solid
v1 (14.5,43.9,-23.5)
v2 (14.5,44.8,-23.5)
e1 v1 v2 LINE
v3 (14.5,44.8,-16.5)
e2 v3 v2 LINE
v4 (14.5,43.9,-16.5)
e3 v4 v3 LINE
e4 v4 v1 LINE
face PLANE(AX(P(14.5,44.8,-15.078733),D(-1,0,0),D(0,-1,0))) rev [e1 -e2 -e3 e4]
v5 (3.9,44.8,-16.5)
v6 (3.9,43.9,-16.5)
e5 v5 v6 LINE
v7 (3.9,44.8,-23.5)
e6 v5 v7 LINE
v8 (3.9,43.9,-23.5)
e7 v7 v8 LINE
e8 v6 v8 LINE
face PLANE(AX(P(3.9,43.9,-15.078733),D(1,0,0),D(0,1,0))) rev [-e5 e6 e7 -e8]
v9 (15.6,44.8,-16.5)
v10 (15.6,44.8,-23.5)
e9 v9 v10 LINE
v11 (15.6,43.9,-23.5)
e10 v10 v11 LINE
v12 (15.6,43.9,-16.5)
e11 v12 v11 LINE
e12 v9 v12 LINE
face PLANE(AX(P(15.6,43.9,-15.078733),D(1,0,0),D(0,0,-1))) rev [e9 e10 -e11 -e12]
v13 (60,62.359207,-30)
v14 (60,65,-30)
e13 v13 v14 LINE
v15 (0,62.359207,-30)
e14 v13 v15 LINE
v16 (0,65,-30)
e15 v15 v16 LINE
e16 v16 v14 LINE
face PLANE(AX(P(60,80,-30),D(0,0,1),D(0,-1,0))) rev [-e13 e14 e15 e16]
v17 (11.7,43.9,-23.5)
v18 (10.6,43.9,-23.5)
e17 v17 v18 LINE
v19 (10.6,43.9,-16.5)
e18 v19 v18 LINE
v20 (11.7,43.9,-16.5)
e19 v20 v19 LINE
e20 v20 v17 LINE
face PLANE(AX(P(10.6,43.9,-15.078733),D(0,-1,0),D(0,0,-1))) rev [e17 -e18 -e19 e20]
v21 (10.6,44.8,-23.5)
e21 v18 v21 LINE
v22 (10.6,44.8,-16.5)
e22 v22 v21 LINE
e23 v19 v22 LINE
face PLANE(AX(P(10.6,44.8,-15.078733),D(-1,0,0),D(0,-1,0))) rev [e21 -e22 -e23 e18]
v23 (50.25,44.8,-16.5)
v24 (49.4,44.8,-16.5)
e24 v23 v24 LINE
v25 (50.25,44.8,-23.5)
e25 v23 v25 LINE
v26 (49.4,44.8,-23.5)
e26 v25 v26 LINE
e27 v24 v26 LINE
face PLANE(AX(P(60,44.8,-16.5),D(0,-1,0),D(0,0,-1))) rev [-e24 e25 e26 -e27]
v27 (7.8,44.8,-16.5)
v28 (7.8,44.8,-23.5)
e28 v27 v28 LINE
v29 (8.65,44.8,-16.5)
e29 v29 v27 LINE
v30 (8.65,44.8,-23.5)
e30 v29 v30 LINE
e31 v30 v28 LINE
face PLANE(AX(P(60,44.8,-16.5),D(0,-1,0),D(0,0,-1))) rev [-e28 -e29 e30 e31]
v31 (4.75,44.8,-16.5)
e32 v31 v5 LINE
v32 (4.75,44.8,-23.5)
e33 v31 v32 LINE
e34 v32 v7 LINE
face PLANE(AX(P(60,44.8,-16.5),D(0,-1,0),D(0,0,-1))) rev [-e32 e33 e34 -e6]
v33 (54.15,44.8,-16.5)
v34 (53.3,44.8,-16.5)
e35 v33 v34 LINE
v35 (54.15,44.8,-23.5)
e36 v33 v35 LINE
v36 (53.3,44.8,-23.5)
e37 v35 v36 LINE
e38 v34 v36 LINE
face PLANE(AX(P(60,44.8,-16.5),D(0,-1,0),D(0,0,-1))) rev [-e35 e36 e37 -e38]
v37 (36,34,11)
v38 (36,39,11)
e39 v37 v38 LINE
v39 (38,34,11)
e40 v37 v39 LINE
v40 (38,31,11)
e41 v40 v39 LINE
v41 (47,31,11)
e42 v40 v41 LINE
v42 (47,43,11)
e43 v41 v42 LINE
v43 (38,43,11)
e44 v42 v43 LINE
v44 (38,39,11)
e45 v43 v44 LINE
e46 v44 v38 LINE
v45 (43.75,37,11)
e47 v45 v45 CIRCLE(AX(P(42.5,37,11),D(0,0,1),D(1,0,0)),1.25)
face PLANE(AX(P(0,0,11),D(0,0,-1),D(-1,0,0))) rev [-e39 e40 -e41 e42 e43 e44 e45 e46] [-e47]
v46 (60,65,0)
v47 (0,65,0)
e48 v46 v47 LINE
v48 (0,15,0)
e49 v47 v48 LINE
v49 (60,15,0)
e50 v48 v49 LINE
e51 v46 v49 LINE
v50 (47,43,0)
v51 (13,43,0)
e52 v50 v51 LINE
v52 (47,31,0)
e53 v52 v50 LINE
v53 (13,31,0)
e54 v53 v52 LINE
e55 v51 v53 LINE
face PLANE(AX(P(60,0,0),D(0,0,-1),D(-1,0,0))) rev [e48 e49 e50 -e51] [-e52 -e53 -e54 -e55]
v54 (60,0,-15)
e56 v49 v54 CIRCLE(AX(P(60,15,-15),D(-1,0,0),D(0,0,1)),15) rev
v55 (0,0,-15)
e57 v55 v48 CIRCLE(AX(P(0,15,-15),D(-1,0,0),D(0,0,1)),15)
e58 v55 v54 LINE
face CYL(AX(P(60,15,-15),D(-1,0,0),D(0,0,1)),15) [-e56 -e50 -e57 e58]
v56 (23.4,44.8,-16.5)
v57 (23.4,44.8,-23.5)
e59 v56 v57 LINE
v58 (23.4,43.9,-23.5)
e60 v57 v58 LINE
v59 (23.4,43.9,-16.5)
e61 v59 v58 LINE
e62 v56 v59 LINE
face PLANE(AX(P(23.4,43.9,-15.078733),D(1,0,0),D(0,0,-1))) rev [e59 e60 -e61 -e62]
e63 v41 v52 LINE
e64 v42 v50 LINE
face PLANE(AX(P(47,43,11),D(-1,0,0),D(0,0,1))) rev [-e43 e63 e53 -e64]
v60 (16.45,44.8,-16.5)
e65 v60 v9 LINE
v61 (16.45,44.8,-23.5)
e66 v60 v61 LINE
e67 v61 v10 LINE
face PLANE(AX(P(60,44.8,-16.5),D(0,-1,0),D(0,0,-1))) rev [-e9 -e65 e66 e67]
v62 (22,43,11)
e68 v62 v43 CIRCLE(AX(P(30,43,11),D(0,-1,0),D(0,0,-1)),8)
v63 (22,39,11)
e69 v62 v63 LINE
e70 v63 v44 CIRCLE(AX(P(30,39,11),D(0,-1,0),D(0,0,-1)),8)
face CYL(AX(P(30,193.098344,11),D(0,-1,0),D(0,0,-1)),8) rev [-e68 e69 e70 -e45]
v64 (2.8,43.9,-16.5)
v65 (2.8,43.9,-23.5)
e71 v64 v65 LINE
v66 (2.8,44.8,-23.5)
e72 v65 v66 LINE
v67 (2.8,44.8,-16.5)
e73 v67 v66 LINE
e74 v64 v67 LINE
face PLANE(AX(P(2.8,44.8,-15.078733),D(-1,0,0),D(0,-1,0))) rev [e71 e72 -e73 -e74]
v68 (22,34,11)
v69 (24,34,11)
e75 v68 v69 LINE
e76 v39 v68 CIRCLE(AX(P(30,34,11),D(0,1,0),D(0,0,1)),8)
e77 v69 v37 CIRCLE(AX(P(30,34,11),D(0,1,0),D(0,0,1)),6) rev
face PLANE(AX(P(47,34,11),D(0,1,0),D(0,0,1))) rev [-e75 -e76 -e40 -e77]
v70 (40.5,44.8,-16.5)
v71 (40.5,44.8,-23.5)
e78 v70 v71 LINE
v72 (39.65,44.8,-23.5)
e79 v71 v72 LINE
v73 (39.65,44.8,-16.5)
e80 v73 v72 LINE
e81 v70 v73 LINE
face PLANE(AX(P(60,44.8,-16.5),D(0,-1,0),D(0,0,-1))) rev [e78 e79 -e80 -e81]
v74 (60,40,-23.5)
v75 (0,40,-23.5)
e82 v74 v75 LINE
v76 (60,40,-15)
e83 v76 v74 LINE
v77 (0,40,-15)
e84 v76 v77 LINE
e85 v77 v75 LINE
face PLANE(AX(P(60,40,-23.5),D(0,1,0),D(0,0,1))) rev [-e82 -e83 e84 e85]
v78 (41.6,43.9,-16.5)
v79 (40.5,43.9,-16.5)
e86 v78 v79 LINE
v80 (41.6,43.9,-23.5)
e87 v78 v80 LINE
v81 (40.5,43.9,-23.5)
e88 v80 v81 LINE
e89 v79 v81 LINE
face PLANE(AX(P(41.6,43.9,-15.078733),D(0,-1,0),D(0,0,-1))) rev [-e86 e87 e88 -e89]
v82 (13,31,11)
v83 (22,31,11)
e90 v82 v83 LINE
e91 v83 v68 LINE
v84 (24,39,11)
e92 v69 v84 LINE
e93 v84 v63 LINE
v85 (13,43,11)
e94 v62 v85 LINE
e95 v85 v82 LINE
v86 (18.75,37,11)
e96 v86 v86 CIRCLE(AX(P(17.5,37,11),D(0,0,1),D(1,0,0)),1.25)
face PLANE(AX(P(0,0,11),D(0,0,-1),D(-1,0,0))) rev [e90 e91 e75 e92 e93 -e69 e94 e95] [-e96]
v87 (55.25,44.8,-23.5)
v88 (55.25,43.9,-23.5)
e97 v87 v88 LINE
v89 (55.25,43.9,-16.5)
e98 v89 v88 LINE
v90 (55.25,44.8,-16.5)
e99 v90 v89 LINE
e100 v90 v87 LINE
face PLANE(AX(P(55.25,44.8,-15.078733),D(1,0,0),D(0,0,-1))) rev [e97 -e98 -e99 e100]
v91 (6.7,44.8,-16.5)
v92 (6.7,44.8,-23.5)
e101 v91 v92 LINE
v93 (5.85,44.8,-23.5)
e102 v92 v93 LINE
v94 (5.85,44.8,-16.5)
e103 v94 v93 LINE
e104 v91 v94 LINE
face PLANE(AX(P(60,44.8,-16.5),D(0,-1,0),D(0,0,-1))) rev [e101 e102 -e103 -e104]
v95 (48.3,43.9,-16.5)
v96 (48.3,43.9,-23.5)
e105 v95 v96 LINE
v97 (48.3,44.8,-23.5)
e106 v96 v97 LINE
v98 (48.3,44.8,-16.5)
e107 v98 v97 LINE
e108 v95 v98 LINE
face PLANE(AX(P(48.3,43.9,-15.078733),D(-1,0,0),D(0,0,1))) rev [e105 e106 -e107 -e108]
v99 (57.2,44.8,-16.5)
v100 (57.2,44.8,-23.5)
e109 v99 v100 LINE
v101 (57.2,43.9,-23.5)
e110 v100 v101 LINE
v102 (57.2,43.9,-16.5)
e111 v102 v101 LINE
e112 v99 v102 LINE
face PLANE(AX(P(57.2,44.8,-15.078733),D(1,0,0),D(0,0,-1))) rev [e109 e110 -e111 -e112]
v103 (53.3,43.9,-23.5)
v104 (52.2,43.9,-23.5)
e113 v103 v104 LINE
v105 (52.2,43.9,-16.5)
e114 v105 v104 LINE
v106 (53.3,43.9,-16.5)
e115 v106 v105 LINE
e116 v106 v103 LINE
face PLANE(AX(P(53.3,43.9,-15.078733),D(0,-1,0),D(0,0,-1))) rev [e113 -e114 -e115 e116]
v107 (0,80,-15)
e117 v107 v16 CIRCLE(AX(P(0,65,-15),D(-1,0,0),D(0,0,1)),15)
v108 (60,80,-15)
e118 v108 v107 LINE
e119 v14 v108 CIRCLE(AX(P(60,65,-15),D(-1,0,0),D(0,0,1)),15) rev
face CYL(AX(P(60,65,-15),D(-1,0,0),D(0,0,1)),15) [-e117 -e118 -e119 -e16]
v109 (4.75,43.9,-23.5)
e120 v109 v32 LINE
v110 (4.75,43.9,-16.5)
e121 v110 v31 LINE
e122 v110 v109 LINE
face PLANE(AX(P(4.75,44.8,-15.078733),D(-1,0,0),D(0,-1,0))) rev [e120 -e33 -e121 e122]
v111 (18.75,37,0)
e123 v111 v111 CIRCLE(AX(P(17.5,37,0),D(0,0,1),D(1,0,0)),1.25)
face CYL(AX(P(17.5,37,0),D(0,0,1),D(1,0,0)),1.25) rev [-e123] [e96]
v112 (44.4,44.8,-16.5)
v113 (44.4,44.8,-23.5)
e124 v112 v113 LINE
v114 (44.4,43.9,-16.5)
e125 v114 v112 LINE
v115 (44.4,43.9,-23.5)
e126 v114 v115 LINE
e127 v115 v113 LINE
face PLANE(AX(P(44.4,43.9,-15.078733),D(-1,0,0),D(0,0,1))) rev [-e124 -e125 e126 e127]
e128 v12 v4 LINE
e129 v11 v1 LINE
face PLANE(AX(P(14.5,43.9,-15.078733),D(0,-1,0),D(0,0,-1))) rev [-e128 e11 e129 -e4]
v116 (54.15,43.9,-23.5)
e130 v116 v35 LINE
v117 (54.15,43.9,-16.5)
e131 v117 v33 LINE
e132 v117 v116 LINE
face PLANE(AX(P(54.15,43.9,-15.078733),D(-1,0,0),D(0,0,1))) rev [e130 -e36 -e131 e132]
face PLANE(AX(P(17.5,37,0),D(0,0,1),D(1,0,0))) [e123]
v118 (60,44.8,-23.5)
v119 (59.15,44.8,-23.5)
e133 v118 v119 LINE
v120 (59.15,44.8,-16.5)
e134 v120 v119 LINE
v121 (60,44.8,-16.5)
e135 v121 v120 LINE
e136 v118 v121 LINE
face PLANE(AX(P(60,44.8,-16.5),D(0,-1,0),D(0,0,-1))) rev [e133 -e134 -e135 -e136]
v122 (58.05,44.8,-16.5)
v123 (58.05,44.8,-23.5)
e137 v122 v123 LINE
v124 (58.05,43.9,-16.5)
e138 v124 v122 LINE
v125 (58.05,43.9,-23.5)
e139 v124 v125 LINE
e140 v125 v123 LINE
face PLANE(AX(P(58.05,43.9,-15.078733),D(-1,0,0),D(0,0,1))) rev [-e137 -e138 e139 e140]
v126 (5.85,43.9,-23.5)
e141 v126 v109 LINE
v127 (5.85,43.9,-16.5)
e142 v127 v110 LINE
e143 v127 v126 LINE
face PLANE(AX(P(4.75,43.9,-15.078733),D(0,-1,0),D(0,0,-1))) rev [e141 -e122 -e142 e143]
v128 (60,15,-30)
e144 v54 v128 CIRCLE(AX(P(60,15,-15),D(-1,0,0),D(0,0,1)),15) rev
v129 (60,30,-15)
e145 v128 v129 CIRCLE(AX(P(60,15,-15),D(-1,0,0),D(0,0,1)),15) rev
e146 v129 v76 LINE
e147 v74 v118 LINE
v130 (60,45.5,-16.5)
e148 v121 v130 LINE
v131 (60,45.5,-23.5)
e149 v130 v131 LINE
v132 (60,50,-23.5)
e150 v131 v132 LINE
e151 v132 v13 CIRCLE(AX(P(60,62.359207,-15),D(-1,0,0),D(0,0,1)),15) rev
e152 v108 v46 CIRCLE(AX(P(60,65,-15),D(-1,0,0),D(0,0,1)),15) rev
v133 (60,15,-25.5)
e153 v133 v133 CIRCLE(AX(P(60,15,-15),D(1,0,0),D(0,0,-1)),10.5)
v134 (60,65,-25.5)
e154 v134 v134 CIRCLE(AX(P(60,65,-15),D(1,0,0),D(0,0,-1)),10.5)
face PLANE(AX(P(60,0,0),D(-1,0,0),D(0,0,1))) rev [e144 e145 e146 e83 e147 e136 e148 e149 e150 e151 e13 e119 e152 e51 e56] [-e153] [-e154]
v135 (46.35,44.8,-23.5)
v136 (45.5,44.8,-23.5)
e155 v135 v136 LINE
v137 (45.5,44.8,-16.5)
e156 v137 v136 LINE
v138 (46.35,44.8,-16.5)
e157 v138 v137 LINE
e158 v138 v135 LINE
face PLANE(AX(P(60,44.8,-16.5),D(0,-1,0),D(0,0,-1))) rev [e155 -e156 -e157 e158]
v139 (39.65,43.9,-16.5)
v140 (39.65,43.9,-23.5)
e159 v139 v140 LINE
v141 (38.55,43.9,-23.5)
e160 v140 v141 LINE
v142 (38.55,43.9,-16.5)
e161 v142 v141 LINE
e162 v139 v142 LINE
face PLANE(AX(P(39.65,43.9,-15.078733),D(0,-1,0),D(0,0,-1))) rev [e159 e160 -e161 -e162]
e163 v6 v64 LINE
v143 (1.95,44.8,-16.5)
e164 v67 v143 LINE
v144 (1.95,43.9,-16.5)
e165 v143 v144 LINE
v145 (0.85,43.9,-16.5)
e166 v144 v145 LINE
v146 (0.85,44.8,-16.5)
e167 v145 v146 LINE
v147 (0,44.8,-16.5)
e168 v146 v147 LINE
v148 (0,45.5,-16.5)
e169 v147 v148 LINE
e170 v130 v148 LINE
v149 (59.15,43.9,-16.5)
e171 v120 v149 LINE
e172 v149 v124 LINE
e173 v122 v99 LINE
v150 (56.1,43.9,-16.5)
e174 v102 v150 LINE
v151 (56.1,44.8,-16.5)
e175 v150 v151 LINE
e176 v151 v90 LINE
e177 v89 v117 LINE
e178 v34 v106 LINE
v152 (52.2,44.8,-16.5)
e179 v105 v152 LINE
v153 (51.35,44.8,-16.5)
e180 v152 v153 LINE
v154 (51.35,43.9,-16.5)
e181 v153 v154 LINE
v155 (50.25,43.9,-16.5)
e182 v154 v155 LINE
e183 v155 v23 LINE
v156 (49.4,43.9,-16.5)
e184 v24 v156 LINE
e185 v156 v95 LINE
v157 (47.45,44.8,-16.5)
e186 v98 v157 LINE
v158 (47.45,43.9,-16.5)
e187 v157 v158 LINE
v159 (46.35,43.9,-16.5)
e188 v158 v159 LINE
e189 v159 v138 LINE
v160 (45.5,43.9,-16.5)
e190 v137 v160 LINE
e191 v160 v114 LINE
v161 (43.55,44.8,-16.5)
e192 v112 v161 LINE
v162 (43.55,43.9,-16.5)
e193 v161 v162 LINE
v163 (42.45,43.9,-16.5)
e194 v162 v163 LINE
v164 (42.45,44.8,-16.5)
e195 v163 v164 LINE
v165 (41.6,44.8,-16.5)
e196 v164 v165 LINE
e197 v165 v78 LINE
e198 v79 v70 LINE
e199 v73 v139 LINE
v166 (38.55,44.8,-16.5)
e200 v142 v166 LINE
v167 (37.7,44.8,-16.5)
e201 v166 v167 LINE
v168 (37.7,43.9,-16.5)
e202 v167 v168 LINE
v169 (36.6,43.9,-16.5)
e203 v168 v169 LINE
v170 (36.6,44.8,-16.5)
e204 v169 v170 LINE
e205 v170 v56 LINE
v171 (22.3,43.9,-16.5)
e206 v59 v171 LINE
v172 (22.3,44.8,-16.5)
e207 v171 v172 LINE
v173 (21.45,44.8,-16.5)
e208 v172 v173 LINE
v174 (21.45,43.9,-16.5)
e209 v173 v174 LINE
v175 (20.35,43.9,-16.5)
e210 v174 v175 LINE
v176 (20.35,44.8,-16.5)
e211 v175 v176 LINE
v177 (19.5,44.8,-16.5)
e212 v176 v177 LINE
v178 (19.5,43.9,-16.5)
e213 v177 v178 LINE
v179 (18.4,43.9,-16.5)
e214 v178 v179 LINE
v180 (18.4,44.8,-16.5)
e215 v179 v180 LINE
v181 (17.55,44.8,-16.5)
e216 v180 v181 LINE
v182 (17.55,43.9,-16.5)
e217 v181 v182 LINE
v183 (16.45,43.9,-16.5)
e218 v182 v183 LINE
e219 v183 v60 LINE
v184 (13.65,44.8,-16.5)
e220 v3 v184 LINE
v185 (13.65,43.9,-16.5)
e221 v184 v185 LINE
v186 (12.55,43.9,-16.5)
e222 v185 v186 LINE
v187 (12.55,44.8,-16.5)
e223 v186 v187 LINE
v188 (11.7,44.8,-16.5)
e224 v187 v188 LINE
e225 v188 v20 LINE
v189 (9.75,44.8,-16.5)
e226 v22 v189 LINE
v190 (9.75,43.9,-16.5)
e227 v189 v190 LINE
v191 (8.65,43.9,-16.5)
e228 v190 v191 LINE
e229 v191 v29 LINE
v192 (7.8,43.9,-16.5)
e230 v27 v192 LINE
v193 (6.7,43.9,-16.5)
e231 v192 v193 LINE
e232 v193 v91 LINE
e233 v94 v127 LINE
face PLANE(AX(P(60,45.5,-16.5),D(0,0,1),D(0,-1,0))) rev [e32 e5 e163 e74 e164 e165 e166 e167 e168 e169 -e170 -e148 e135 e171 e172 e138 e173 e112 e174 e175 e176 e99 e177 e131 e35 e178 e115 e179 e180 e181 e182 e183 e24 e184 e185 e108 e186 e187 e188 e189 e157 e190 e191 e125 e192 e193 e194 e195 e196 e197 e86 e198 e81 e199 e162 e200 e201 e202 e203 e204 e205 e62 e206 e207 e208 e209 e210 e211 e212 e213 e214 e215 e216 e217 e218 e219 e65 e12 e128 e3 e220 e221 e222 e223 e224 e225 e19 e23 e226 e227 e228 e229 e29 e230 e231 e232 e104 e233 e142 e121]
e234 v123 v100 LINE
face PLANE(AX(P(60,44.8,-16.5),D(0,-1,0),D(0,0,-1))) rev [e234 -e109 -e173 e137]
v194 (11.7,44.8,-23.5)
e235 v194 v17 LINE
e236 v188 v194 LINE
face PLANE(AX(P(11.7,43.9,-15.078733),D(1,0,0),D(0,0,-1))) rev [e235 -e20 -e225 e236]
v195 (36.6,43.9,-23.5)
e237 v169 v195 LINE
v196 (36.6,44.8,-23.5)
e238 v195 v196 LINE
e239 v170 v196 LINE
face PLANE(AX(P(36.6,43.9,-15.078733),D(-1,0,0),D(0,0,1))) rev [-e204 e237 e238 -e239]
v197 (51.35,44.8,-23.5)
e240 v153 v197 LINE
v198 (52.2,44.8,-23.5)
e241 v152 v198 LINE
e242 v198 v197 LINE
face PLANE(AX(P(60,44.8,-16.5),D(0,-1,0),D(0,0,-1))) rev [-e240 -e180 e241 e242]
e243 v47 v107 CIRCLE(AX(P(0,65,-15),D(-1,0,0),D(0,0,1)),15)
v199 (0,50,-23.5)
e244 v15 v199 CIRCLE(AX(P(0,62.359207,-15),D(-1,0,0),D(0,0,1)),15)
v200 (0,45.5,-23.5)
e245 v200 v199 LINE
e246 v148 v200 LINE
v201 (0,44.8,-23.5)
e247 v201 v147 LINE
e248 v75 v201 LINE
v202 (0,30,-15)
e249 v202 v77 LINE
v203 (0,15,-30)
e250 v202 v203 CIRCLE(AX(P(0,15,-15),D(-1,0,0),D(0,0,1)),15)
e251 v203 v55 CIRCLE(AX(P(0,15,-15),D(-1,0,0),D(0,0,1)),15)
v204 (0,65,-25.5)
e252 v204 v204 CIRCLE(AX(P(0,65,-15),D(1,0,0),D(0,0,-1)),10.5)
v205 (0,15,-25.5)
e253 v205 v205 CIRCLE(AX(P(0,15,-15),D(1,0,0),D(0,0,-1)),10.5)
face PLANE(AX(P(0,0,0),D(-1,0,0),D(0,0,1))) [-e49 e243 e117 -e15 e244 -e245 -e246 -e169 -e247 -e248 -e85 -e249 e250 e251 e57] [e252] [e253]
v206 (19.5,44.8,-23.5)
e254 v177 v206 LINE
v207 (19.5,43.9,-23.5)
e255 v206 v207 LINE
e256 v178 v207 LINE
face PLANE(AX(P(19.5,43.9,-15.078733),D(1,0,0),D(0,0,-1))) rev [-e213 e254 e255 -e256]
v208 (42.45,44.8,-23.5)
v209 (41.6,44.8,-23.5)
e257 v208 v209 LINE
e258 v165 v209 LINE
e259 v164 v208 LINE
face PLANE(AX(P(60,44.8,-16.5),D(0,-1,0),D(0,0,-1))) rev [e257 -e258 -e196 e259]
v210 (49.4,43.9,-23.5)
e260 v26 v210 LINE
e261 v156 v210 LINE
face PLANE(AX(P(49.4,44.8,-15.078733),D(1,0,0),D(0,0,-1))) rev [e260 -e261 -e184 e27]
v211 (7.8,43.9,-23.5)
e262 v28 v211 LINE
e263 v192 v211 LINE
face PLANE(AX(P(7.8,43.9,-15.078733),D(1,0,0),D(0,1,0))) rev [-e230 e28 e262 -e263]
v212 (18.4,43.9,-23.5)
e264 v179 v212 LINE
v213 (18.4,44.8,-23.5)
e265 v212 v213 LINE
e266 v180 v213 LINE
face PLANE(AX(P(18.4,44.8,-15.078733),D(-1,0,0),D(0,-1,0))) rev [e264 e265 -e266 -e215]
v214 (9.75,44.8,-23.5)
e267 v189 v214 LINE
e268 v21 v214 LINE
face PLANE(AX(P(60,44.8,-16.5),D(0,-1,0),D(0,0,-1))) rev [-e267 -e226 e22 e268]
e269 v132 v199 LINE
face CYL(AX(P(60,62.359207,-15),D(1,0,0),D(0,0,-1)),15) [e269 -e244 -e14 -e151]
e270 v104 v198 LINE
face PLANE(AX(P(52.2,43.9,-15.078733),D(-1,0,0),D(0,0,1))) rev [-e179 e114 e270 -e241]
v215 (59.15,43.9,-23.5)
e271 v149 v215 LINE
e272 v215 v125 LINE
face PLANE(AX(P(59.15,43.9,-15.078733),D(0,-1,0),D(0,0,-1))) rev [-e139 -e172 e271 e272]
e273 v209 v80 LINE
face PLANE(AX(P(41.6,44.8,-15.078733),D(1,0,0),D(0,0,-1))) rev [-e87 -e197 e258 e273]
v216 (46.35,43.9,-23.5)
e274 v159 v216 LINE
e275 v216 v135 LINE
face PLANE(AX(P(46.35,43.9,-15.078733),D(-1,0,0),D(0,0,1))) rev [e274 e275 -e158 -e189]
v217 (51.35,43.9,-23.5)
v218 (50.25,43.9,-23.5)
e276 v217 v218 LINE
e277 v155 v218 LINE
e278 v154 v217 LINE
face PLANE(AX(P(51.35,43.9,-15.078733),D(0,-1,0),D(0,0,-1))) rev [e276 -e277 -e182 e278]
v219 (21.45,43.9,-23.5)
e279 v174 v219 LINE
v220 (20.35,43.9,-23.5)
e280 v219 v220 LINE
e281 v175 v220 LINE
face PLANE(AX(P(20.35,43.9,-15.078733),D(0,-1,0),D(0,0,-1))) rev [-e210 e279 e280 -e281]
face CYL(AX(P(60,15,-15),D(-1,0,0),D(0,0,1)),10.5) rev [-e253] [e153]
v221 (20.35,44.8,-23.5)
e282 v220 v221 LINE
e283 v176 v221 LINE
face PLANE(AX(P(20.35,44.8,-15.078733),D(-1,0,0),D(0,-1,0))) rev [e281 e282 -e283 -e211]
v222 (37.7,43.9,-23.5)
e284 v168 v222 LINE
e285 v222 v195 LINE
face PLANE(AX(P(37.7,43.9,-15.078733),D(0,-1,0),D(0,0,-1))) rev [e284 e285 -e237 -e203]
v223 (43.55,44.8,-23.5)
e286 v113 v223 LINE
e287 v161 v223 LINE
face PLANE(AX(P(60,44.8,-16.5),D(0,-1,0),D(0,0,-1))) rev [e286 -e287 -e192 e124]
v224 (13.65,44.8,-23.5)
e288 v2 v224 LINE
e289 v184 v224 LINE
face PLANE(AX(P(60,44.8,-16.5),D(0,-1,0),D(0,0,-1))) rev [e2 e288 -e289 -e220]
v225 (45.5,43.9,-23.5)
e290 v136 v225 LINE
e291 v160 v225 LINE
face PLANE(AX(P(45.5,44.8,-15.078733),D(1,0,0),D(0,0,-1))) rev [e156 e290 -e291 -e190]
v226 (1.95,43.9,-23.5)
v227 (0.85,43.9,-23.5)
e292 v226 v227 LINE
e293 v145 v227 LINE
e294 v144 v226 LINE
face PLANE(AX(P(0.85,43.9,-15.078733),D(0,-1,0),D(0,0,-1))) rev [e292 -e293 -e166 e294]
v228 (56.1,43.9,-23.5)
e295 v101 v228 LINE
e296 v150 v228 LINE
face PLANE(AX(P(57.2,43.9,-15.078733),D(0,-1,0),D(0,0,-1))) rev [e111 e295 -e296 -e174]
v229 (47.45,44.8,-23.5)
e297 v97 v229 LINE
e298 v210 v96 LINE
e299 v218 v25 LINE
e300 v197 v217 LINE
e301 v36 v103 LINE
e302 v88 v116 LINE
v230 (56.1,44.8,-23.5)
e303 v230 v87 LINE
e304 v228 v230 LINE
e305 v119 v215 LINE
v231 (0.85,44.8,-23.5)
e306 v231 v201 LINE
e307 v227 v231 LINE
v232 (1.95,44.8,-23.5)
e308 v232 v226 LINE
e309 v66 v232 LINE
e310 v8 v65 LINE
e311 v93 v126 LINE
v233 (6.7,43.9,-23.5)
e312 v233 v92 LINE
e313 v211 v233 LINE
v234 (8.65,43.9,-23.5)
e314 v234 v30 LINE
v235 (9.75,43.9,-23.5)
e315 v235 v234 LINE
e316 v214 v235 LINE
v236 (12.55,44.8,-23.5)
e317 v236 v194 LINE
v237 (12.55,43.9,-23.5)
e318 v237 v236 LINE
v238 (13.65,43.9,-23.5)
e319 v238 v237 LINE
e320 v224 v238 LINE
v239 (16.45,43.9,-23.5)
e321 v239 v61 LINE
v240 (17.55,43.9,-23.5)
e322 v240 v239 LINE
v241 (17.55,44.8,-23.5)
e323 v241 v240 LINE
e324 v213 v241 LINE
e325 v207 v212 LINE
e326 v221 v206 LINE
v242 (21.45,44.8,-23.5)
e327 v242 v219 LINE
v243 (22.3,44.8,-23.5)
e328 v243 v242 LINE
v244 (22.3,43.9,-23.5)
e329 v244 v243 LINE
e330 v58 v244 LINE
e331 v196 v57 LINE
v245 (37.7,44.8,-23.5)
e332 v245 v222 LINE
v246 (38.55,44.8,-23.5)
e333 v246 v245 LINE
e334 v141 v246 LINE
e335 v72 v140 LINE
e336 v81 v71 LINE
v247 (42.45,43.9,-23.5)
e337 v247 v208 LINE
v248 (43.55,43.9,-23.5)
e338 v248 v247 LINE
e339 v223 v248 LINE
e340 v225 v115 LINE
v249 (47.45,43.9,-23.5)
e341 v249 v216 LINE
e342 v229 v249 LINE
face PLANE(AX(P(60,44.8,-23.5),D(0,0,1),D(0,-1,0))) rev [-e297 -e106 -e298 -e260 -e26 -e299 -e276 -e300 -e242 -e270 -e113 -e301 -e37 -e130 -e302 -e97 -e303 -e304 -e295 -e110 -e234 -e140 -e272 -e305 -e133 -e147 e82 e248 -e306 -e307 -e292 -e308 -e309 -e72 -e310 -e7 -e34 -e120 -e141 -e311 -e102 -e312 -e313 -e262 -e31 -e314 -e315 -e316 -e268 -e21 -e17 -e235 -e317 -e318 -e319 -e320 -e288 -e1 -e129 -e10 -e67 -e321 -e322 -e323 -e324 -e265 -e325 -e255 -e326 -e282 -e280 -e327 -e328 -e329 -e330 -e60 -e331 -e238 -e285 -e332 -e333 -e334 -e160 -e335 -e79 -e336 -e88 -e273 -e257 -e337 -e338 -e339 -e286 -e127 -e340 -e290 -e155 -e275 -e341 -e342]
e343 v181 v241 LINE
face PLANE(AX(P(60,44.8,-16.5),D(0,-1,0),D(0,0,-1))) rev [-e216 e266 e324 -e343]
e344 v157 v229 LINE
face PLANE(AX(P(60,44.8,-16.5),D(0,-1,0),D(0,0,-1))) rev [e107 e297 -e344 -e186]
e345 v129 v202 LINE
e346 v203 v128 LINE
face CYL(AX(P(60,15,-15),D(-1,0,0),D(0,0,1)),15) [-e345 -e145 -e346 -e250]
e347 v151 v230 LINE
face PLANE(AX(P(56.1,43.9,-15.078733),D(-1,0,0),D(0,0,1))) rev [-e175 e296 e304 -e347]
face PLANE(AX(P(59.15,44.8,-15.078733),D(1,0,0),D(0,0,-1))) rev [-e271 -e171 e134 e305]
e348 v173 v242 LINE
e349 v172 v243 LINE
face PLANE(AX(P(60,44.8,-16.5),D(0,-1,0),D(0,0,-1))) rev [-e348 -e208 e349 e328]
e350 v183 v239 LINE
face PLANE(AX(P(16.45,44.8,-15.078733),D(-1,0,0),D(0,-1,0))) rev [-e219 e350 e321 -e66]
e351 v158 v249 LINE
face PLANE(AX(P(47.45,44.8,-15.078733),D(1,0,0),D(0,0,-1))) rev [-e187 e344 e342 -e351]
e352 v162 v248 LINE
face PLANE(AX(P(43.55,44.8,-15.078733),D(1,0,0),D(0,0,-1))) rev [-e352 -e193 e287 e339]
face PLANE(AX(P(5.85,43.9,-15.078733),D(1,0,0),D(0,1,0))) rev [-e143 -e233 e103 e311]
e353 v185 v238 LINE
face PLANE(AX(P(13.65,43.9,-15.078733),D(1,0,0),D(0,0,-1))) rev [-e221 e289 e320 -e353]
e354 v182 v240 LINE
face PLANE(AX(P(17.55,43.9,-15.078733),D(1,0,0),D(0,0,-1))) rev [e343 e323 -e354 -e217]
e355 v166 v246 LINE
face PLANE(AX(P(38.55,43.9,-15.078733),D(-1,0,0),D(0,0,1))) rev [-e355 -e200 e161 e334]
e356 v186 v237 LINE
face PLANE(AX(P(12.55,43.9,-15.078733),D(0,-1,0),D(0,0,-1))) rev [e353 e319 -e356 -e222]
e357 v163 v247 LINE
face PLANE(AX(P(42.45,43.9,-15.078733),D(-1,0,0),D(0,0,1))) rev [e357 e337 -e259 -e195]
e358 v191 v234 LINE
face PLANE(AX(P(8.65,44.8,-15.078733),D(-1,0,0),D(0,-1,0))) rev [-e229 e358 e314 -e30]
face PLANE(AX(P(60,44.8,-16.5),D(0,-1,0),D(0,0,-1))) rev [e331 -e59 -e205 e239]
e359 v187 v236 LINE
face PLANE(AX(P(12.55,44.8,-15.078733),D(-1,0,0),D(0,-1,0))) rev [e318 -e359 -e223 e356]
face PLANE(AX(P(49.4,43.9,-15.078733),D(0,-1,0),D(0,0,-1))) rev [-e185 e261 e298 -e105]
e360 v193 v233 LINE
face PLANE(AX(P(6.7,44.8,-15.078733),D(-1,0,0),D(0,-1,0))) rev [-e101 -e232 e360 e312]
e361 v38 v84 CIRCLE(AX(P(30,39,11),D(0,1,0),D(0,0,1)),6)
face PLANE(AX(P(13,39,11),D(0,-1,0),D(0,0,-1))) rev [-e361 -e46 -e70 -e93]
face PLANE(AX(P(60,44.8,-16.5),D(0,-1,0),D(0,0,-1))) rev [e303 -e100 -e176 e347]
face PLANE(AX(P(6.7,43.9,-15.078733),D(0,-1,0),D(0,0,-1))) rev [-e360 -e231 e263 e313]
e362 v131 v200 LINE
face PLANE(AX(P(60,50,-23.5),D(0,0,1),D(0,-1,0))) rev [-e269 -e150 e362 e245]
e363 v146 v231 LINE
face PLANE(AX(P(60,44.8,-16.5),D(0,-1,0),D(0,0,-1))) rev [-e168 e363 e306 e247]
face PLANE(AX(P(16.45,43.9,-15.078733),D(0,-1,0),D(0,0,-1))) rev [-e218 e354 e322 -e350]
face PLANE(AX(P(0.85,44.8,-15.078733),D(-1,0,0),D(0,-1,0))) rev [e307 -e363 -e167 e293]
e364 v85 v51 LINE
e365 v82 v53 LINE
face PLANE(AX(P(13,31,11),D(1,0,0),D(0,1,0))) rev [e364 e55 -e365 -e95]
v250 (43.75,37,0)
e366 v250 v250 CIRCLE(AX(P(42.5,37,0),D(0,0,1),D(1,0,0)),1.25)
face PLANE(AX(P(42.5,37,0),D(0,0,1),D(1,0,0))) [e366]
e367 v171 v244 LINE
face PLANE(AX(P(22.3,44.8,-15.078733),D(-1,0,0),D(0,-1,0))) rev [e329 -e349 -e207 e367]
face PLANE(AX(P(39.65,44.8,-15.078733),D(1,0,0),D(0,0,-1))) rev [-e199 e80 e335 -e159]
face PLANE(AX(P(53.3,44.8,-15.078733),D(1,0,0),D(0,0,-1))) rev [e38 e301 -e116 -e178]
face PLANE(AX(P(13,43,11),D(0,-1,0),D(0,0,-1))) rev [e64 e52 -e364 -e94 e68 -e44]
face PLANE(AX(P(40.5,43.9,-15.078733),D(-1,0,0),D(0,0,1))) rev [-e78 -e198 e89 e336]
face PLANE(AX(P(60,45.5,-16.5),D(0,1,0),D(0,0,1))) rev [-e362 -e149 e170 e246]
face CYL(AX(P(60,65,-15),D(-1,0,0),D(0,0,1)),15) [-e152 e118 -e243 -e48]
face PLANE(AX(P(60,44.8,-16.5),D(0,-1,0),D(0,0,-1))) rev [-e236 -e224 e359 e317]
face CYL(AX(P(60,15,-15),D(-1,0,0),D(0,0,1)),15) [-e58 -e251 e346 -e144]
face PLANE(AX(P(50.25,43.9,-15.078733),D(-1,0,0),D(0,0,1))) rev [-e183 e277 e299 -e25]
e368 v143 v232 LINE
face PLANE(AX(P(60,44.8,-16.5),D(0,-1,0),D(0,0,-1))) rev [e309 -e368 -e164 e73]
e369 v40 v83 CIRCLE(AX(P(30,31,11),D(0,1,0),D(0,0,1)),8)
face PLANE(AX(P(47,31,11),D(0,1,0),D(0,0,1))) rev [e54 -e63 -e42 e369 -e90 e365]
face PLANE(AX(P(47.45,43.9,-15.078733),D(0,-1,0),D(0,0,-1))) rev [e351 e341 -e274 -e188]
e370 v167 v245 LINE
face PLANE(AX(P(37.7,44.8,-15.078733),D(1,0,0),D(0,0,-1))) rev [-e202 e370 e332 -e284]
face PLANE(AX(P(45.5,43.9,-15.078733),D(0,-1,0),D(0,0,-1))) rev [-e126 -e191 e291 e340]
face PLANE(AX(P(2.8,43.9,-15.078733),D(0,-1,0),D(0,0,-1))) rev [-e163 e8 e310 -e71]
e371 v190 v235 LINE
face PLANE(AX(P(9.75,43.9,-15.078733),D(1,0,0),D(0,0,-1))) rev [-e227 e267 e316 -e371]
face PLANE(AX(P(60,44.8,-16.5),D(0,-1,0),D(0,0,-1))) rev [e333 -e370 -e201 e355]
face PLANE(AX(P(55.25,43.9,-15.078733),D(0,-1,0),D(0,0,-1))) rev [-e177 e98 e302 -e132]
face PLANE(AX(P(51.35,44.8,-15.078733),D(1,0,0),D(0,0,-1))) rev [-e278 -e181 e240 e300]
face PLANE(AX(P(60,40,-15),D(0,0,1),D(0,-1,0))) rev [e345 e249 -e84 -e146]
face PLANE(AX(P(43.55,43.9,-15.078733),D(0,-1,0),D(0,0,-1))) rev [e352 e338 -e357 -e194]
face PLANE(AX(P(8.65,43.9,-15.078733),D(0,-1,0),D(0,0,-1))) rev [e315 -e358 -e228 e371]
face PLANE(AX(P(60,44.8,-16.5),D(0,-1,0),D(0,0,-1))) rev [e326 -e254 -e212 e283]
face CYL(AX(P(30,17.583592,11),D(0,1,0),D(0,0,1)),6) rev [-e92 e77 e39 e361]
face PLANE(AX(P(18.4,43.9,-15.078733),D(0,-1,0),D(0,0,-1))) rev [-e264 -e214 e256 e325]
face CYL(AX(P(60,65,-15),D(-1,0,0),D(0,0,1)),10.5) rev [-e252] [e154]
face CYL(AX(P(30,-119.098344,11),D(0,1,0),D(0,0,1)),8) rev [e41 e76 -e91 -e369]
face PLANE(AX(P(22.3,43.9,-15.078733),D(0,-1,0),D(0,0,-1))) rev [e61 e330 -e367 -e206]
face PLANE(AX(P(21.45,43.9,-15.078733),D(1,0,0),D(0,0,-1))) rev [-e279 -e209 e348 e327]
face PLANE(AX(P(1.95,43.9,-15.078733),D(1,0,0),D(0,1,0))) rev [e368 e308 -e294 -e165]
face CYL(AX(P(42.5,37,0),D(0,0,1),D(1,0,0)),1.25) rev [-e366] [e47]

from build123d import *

# Parameters (mm, degrees)
SKETCH_1_R               = 10.5
EXTRUDE_2_DEPTH          = 60
FILLET_1_R               = 15
FILLET_5_R               = 15
FILLET_3_R               = 15
SKETCH_2_W               = 34
SKETCH_2_H               = 12
EXTRUDE_3_DEPTH          = 11
CUT_EXTRUDE_1_DEPTH      = 12
CUT_EXTRUDE_2_DEPTH      = 80.680612447
CUT_EXTRUDE_2_DEPTH_BACK = 4
CUT_EXTRUDE_3_DEPTH      = 84.072257704
CUT_EXTRUDE_3_DEPTH_BACK = 3
SKETCH_6_R               = 1.25
CUT_EXTRUDE_4_DEPTH      = 11
FILLET_10_R              = 15
FILLET_11_R              = 15
FILLET_13_R              = 15
SKETCH_9_W               = 1.1
SKETCH_9_H               = 0.9
CUT_EXTRUDE_6_DEPTH      = 7
SKETCH_11_W              = 1.1
SKETCH_11_H              = 0.9
CUT_EXTRUDE_7_DEPTH      = 7


# Some blends are built 0.0001 mm under size
with BuildPart() as part:
    # Эскиз1 → Бобышка-Вытянуть2 (new body)
    with BuildSketch(Plane(origin=(0, 0, 0), x_dir=(0, 0, -1), z_dir=(1, 0, 0))):
        Polygon((0, 0), (0, 80), (30, 80), (30, 50), (23.5, 50), (23.5, 45.5), (16.5, 45.5), (16.5, 44.8), (23.5, 44.8), (23.5, 40), (16.5, 40), (15, 40), (15, 30), (30, 30), (30, 0), align=None)
        with Locations((15, 15)):
            Circle(SKETCH_1_R, mode=Mode.SUBTRACT)
        with Locations((15, 65)):
            Circle(SKETCH_1_R, mode=Mode.SUBTRACT)
    extrude(amount=EXTRUDE_2_DEPTH)

    # Скругление1
    fillet_1_edges = [part.edges().sort_by_distance(p)[0] for p in [
        (30, 30, -30),
    ]]
    fillet(fillet_1_edges, radius=FILLET_1_R - 0.0001)  # a hair under: the kernel refuses the full size

    # Скругление5
    fillet_5_edges = [part.edges().sort_by_distance(p)[0] for p in [
        (30, 80, -30),
    ]]
    fillet(fillet_5_edges, radius=FILLET_5_R)

    # Скругление3
    fillet_3_edges = [part.edges().sort_by_distance(p)[0] for p in [
        (30, 0, -30),
    ]]
    fillet(fillet_3_edges, radius=FILLET_3_R)

    # Эскиз2 → Бобышка-Вытянуть3 (add)
    with BuildSketch(Plane.XY):
        with Locations((30, 37)):
            Rectangle(SKETCH_2_W, SKETCH_2_H)
    extrude(amount=EXTRUDE_3_DEPTH)

    # Эскиз3 → Вырез-Вытянуть1 (cut)
    with BuildSketch(Plane(origin=(0, 43, 0), x_dir=(1, 0, 0), z_dir=(0, 1, 0))):
        with BuildLine():
            ThreePointArc((36, -11), (30, -5), (24, -11))
            Line((24, -11), (36, -11))
        make_face()
    extrude(amount=-CUT_EXTRUDE_1_DEPTH, mode=Mode.SUBTRACT)

    # Эскиз4 → Вырез-Вытянуть2 (cut, two sides: drawn at the far end of the back side and taken through both)
    with BuildSketch(Plane(origin=(0, 43, 0), x_dir=(1, 0, 0), z_dir=(0, 1, 0)).offset(-CUT_EXTRUDE_2_DEPTH_BACK)):
        with BuildLine():
            Line((38, -132.803398875), (38, -11))
            ThreePointArc((38, -11), (30, -3), (22, -11))
            Line((22, -11), (22, -132.803398875))
            Line((22, -132.803398875), (22, -376.410196625))
            Line((22, -376.410196625), (38, -376.410196625))
            Line((38, -376.410196625), (38, -132.803398875))
        make_face()
    extrude(amount=CUT_EXTRUDE_2_DEPTH + CUT_EXTRUDE_2_DEPTH_BACK, mode=Mode.SUBTRACT)

    # Эскиз5 → Вырез-Вытянуть3 (cut, two sides: drawn at the far end of the back side and taken through both)
    with BuildSketch(Plane(origin=(0, 31, 0), x_dir=(-1, 0, 0), z_dir=(0, -1, 0)).offset(-CUT_EXTRUDE_3_DEPTH_BACK)):
        with BuildLine():
            Line((-22, -132.803398875), (-22, -11))
            ThreePointArc((-22, -11), (-30, -3), (-38, -11))
            Line((-38, -11), (-38, -132.803398875))
            Line((-38, -132.803398875), (-38, -376.410196625))
            Line((-38, -376.410196625), (-22, -376.410196625))
            Line((-22, -376.410196625), (-22, -132.803398875))
        make_face()
    extrude(amount=CUT_EXTRUDE_3_DEPTH + CUT_EXTRUDE_3_DEPTH_BACK, mode=Mode.SUBTRACT)

    # Эскиз6 → Вырез-Вытянуть4 (cut)
    with BuildSketch(Plane.XY.offset(11)):
        with Locations((17.5, 37)):
            Circle(SKETCH_6_R)
        with Locations((42.5, 37)):
            Circle(SKETCH_6_R)
    extrude(amount=-CUT_EXTRUDE_4_DEPTH, mode=Mode.SUBTRACT)

    # Скругление10
    fillet_10_edges = [part.edges().sort_by_distance(p)[0] for p in [
        (30, 80, 0),
    ]]
    fillet(fillet_10_edges, radius=FILLET_10_R - 0.0001)  # a hair under: the kernel refuses the full size

    # Скругление11
    fillet_11_edges = [part.edges().sort_by_distance(p)[0] for p in [
        (30, 0, 0),
    ]]
    fillet(fillet_11_edges, radius=FILLET_11_R - 0.0001)  # a hair under: the kernel refuses the full size

    # Скругление13
    # the kernel refuses this fillet: 15 mm, written as the material it takes off along each edge
    with BuildSketch(Plane(origin=(-30.898017736, 50, -30), x_dir=(0, 1, 0), z_dir=(1, 0, 0))) as fillet_13_piece_1:
        with BuildLine():
            CenterArc((12.359207094, 15), FILLET_13_R, 214.518107841, 55.481892159)
            Line((0, 6.5), (-0.247184142, 6.33))
            ThreePointArc((-0.247184142, 6.33), (-0.3, 3.25), (-0.3, 0))
            Line((-0.3, 0), (0, -0.3))
            Line((0, -0.3), (12.359207094, -0.3))
            Line((12.359207094, -0.3), (12.359207094, 0))
        make_face()
    extrude(amount=121.796035472, mode=Mode.SUBTRACT)

    # Эскиз9 → Вырез-Вытянуть6 (cut)
    with BuildSketch(Plane(origin=(0, 0, -23.5), x_dir=(-1, 0, 0), z_dir=(0, 0, -1))):
        with Locations((-58.6, 44.35)):
            Rectangle(SKETCH_9_W, SKETCH_9_H)
        with Locations((-56.65, 44.35)):
            Rectangle(SKETCH_9_W, SKETCH_9_H)
        with Locations((-54.7, 44.35)):
            Rectangle(SKETCH_9_W, SKETCH_9_H)
        with Locations((-52.75, 44.35)):
            Rectangle(SKETCH_9_W, SKETCH_9_H)
        with Locations((-50.8, 44.35)):
            Rectangle(SKETCH_9_W, SKETCH_9_H)
        with Locations((-48.85, 44.35)):
            Rectangle(SKETCH_9_W, SKETCH_9_H)
        with Locations((-46.9, 44.35)):
            Rectangle(SKETCH_9_W, SKETCH_9_H)
        with Locations((-44.95, 44.35)):
            Rectangle(SKETCH_9_W, SKETCH_9_H)
        with Locations((-43, 44.35)):
            Rectangle(SKETCH_9_W, SKETCH_9_H)
        with Locations((-41.05, 44.35)):
            Rectangle(SKETCH_9_W, SKETCH_9_H)
        with Locations((-39.1, 44.35)):
            Rectangle(SKETCH_9_W, SKETCH_9_H)
        with Locations((-37.15, 44.35)):
            Rectangle(SKETCH_9_W, SKETCH_9_H)
    extrude(amount=-CUT_EXTRUDE_6_DEPTH, mode=Mode.SUBTRACT)

    # Эскиз11 → Вырез-Вытянуть7 (cut)
    with BuildSketch(Plane(origin=(0, 0, -23.5), x_dir=(-1, 0, 0), z_dir=(0, 0, -1))):
        with Locations((-1.4, 44.35)):
            Rectangle(SKETCH_11_W, SKETCH_11_H)
        with Locations((-3.35, 44.35)):
            Rectangle(SKETCH_11_W, SKETCH_11_H)
        with Locations((-5.3, 44.35)):
            Rectangle(SKETCH_11_W, SKETCH_11_H)
        with Locations((-7.25, 44.35)):
            Rectangle(SKETCH_11_W, SKETCH_11_H)
        with Locations((-9.2, 44.35)):
            Rectangle(SKETCH_11_W, SKETCH_11_H)
        with Locations((-11.15, 44.35)):
            Rectangle(SKETCH_11_W, SKETCH_11_H)
        with Locations((-13.1, 44.35)):
            Rectangle(SKETCH_11_W, SKETCH_11_H)
        with Locations((-15.05, 44.35)):
            Rectangle(SKETCH_11_W, SKETCH_11_H)
        with Locations((-17, 44.35)):
            Rectangle(SKETCH_11_W, SKETCH_11_H)
        with Locations((-18.95, 44.35)):
            Rectangle(SKETCH_11_W, SKETCH_11_H)
        with Locations((-20.9, 44.35)):
            Rectangle(SKETCH_11_W, SKETCH_11_H)
        with Locations((-22.85, 44.35)):
            Rectangle(SKETCH_11_W, SKETCH_11_H)
    extrude(amount=-CUT_EXTRUDE_7_DEPTH, mode=Mode.SUBTRACT)


solid = part.part
